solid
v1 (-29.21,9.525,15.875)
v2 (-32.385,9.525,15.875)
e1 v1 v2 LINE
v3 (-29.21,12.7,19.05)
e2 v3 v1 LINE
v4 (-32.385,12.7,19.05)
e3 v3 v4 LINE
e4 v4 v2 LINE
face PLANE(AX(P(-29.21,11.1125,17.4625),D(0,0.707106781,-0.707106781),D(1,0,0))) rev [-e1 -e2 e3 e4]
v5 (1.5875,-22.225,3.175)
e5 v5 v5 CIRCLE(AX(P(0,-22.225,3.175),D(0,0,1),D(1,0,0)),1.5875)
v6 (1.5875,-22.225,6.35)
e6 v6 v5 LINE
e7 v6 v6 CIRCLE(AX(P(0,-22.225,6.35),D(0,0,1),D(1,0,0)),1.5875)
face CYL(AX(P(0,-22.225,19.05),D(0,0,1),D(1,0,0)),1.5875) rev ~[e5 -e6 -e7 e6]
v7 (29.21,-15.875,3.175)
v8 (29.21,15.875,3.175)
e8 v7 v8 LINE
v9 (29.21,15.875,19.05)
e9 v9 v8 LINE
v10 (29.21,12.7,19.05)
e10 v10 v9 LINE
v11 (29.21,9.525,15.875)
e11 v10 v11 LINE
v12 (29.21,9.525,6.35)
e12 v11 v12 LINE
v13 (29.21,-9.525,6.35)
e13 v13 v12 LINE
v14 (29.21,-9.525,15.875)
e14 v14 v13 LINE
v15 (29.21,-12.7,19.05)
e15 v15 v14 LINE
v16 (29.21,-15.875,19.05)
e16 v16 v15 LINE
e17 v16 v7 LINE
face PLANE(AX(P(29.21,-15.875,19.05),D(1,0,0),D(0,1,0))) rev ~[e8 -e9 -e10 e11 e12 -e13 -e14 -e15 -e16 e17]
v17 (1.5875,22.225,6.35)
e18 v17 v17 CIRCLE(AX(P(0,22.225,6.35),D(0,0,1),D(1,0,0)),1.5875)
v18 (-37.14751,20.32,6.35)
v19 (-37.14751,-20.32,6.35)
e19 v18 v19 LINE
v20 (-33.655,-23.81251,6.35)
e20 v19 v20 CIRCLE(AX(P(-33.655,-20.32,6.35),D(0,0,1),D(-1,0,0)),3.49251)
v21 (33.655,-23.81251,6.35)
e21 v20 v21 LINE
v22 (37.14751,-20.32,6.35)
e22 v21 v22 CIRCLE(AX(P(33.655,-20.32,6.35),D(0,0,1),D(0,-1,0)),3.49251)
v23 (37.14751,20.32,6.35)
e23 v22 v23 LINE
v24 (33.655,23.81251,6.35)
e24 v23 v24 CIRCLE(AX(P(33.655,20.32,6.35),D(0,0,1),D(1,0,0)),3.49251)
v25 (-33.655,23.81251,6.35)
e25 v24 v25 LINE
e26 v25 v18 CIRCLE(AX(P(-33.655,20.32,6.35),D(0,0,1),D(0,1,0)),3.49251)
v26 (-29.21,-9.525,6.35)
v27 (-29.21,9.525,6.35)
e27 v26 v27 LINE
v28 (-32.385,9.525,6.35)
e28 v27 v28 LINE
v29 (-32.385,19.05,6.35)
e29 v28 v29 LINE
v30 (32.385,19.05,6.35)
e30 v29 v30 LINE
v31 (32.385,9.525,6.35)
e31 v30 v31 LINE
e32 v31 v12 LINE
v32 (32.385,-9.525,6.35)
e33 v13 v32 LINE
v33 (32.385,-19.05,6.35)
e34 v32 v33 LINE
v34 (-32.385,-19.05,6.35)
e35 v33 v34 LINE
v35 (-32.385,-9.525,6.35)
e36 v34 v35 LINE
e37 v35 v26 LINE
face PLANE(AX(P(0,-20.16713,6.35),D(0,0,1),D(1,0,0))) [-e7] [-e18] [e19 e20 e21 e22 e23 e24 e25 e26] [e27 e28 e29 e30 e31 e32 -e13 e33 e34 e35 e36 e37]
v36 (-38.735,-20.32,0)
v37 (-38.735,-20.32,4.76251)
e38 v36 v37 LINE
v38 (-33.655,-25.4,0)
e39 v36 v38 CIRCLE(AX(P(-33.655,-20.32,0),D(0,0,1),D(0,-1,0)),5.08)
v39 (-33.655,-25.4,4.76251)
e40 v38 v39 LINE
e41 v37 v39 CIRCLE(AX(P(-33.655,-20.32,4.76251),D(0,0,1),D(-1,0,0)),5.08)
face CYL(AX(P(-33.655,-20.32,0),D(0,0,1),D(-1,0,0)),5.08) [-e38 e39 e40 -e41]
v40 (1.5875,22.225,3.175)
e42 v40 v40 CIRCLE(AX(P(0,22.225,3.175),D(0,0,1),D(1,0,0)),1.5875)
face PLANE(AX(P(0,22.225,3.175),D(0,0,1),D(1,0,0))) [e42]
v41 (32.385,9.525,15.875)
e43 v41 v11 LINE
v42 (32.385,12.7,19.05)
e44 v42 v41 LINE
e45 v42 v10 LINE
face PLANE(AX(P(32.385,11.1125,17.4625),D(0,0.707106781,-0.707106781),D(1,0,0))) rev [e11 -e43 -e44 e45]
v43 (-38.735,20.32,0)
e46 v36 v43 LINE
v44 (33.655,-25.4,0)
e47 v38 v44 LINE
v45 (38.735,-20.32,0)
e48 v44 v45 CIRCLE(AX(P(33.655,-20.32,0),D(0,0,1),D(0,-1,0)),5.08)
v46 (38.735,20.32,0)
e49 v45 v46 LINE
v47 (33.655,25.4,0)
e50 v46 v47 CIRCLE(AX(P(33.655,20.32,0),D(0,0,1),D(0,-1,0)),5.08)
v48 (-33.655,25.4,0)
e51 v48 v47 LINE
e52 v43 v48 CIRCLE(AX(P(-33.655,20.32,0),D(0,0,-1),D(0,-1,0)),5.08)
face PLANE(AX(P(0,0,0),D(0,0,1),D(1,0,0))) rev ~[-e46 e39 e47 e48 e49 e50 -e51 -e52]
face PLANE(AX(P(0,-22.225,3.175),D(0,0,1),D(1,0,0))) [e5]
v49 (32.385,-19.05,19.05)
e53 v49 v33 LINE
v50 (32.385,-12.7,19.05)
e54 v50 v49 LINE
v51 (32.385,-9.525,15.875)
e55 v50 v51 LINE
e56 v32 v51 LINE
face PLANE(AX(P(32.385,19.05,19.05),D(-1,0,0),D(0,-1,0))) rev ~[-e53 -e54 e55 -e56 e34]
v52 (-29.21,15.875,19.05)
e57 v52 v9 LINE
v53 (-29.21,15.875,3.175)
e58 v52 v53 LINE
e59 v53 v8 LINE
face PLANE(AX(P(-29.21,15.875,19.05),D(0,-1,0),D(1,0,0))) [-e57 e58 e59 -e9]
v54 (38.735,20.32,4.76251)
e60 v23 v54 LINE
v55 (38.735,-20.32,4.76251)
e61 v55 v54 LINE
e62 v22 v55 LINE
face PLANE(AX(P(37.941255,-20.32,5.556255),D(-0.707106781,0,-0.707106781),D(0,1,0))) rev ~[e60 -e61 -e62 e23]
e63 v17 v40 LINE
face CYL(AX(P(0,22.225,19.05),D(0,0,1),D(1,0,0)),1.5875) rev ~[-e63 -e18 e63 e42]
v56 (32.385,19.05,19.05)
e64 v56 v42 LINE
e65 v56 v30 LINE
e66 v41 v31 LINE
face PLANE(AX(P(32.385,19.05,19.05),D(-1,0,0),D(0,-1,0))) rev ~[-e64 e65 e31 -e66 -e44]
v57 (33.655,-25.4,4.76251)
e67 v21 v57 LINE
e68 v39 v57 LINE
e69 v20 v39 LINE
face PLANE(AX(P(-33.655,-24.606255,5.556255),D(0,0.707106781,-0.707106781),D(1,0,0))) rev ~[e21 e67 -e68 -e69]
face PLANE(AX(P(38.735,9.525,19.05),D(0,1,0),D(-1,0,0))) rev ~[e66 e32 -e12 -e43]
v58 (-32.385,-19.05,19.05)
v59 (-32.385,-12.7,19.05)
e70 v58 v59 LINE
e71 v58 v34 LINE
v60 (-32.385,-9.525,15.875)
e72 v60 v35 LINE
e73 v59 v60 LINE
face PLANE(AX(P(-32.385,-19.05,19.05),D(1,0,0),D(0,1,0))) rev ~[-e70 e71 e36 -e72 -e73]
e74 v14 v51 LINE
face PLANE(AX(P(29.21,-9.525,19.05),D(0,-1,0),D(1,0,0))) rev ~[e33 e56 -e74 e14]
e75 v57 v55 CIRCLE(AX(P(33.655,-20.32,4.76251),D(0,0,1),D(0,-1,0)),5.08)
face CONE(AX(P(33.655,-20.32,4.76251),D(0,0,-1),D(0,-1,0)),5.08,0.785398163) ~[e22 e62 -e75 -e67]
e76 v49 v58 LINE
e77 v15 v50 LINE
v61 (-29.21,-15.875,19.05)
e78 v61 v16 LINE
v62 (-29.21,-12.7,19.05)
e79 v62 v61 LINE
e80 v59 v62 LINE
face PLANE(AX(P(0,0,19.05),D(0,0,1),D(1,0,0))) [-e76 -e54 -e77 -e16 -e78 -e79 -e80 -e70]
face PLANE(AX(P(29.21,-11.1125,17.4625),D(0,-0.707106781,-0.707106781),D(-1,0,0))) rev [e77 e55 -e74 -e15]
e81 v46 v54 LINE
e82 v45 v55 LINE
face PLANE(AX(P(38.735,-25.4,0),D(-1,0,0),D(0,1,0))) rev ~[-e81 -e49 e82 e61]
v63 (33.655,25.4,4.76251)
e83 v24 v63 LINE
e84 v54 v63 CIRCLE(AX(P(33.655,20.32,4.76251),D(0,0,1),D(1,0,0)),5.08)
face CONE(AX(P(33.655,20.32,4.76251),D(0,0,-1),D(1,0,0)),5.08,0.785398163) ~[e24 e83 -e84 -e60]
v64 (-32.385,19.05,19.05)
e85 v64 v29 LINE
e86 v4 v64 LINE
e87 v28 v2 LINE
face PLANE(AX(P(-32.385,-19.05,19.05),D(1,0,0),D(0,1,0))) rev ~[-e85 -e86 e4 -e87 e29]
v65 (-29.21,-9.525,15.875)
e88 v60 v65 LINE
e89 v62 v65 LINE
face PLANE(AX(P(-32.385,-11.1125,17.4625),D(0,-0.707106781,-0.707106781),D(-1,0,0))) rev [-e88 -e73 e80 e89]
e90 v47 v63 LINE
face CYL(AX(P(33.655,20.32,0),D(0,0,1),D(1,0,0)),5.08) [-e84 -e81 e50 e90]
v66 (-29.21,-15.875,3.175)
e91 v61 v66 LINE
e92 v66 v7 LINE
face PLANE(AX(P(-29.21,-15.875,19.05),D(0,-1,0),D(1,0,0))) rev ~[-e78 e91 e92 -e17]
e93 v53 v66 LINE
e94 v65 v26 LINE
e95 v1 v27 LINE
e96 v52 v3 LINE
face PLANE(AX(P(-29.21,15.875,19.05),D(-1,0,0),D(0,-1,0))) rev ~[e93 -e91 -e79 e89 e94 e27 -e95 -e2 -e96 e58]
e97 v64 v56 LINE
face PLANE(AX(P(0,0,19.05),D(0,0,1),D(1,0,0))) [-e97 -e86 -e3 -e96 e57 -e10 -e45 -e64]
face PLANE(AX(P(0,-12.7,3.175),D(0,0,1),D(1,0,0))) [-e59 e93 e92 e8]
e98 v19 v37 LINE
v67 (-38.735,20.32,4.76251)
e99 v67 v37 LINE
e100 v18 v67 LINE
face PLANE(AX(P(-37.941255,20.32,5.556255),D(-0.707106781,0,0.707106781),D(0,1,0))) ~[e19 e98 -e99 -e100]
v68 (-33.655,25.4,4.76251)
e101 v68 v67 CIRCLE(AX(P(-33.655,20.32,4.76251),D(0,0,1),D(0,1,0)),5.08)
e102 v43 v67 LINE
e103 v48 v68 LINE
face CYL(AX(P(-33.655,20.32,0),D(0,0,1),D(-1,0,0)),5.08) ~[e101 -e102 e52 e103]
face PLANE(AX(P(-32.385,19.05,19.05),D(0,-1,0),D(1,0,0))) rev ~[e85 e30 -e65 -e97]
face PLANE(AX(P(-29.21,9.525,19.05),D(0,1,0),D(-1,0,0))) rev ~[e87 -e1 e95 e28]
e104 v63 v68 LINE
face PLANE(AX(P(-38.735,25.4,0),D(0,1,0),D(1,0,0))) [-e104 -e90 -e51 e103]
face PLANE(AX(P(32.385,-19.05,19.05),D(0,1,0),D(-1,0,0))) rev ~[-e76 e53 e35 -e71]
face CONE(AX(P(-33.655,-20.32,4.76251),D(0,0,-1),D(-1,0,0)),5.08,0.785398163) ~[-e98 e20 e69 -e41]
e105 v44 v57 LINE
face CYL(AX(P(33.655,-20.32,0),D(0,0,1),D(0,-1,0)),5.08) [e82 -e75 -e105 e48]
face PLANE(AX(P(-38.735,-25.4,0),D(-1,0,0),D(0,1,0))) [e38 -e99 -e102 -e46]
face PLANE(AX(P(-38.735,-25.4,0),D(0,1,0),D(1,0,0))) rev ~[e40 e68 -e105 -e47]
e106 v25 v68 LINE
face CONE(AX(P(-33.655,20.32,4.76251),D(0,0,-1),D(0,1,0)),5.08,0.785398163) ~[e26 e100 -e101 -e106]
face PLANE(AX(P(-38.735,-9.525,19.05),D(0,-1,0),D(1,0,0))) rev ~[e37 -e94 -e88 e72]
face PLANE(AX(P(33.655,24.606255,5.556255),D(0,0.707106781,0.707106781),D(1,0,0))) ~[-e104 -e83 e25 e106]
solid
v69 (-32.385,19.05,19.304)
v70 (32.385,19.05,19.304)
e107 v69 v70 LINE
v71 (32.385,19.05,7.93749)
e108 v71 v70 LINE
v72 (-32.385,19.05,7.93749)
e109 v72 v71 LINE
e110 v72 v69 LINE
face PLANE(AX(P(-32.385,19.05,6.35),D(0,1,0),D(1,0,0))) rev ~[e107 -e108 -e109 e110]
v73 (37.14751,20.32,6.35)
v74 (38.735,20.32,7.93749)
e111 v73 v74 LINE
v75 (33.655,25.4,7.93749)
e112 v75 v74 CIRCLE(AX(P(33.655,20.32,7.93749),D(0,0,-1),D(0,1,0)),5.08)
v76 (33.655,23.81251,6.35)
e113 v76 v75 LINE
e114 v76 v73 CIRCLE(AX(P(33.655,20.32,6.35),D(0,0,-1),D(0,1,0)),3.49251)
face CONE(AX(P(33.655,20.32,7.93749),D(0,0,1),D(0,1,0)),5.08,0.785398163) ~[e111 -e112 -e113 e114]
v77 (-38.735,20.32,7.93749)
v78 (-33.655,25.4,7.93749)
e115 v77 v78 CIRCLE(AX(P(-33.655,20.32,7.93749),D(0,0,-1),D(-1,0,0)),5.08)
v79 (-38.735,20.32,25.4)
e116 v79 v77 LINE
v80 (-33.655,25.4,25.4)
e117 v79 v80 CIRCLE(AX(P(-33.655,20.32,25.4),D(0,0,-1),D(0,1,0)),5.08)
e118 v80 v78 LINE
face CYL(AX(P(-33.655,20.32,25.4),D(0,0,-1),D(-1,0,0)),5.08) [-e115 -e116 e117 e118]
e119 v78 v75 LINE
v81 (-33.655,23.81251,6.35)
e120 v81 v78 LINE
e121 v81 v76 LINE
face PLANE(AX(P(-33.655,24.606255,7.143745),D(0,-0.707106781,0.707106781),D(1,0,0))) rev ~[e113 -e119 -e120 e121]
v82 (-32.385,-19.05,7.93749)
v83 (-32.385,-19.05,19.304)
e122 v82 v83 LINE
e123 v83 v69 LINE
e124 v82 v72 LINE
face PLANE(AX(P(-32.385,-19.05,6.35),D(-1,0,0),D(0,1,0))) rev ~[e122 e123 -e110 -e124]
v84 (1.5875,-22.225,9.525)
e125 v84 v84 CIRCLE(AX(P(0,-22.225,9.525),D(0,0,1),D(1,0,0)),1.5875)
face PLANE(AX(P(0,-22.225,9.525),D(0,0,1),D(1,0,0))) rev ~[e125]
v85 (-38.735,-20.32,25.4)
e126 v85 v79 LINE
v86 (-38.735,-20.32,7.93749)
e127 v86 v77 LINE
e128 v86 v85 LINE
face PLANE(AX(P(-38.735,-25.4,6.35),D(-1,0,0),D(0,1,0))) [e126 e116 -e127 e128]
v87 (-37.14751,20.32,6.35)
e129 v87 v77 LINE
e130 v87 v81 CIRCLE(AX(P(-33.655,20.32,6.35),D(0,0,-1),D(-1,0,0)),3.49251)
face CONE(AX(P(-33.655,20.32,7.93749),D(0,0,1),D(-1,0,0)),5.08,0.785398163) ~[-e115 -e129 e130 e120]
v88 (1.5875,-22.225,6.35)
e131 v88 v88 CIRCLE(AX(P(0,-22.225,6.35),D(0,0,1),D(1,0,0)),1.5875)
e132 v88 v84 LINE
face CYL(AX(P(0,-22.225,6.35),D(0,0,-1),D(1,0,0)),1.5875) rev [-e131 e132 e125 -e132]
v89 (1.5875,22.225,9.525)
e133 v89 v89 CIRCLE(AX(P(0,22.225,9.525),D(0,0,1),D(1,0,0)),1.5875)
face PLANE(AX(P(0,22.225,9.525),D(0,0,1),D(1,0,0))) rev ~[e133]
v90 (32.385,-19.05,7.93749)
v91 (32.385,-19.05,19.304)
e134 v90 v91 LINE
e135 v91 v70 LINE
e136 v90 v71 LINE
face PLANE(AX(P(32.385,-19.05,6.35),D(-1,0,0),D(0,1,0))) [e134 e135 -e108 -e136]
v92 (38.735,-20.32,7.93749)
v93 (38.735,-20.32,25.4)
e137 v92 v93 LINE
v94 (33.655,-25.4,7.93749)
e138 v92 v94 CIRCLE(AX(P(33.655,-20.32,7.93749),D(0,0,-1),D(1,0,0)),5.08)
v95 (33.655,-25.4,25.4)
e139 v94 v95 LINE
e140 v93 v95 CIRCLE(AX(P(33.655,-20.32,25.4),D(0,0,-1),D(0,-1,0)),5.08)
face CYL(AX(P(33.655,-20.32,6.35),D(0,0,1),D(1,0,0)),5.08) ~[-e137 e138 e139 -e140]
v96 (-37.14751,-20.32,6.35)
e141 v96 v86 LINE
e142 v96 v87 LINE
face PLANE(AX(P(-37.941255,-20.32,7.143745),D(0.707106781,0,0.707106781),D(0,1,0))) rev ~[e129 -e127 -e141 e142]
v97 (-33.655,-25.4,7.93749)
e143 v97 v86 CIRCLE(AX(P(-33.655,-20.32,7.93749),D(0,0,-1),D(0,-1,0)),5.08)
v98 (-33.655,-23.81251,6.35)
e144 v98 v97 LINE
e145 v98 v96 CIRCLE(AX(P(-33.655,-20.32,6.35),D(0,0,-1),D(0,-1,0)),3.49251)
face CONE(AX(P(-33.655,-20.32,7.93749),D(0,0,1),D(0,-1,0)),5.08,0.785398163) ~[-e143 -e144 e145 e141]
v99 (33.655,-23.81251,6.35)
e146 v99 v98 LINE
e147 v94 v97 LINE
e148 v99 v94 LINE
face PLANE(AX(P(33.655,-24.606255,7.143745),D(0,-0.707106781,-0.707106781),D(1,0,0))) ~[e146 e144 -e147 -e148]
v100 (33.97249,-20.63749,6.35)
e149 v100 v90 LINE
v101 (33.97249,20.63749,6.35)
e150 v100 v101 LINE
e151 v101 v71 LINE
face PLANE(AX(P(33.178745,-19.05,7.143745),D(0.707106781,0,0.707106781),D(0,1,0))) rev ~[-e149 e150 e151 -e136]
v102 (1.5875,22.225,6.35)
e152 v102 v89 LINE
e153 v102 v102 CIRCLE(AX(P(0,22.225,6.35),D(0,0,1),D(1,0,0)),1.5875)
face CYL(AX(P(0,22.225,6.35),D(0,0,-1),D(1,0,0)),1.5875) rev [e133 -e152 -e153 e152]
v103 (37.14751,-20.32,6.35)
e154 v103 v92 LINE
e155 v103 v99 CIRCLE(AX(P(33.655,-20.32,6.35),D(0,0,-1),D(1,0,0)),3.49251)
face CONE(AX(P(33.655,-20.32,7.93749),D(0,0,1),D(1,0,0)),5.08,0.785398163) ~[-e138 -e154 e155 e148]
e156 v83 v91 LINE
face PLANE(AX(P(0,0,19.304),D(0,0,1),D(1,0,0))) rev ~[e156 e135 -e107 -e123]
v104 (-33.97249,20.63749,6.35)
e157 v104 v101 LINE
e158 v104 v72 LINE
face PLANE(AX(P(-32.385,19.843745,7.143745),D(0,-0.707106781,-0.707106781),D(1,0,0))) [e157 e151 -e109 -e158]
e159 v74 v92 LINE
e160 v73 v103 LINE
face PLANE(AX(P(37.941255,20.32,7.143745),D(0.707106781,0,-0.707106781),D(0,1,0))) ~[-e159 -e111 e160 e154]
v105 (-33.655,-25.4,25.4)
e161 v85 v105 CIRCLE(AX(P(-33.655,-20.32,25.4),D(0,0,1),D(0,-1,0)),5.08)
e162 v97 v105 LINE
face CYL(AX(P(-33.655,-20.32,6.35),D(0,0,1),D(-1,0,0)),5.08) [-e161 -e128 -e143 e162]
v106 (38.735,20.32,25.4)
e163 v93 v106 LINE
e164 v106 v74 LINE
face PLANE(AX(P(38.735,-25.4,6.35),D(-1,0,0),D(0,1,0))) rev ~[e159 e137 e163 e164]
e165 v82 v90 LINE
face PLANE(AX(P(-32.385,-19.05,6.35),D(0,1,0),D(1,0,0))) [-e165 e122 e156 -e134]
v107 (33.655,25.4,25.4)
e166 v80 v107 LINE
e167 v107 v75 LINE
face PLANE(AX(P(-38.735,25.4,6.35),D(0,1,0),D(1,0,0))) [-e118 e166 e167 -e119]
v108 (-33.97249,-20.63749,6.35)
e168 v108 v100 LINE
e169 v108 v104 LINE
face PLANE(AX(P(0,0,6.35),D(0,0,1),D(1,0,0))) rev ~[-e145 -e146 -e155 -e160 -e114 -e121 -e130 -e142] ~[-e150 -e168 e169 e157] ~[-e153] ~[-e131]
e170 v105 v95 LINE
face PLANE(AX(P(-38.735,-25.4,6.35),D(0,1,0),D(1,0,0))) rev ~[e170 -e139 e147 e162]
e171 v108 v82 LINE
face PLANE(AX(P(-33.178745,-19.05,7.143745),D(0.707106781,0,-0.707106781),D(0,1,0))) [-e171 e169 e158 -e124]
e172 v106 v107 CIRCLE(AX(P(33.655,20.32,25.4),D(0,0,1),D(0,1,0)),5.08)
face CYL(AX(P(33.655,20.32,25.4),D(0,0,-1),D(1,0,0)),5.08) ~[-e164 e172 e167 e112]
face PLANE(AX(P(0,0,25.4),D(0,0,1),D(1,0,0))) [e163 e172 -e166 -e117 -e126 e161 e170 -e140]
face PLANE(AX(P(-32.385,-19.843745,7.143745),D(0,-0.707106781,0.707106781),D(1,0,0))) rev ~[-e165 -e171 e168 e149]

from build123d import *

# Parameters (mm, degrees)
F0_W       = 77.47
F0_H       = 50.8
F1_DEPTH   = 19.05
F2_W       = 58.42
F2_H       = 6.35
F2_H_2     = 19.05
F3_DEPTH   = 15.875
F2_R       = 1.5875
F2_W_2     = 6.35
F4_DEPTH   = 12.7
F2_W_3     = 3.175
F5_DEPTH   = 12.7
F6_SIZE    = 3.175
F7_W       = 77.47
F7_H       = 50.8
F7_W_2     = 64.77
F7_H_2     = 38.1
F8_DEPTH   = 19.05
F9_W       = 77.47
F9_H       = 50.8
F9_W_2     = 64.77
F9_H_2     = 38.1
F10_DEPTH  = 6.096
F11_R      = 5.08
F11_2_R    = 5.08
F12_DEPTH  = 15.875
F13_SIZE   = 1.58749
F13_2_SIZE = 1.58749
F14_R      = 1.5875
F15_DEPTH  = 3.175


# Not quite as in the source:
# - a fillet or chamfer is up to 0.001 mm smaller than in the source, because OpenCascade refuses the exact size


with BuildPart() as f1:
    # F0 (on Top) → F1 (new body)
    with BuildSketch(Plane.XY):
        Rectangle(F0_W, F0_H)
    extrude(amount=F1_DEPTH)

    # F2 (on face) → F3 (cut)
    with BuildSketch(Plane.XY.offset(19.05)):
        with Locations((0, -12.7)):
            Rectangle(F2_W, F2_H)
        Rectangle(F2_W, F2_H_2)
        with Locations((0, 12.7)):
            Rectangle(F2_W, F2_H)
    extrude(amount=-F3_DEPTH, mode=Mode.SUBTRACT)

    # F2 (on face) → F4 (cut)
    with BuildSketch(Plane.XY.offset(19.05)):
        Polygon((38.735, -9.525), (32.385, -9.525), (32.385, -19.05), (-32.385, -19.05), (-32.385, -9.525), (-38.735, -9.525), (-38.735, -25.4), (38.735, -25.4), align=None)
        with Locations((0, -22.225)):
            Circle(F2_R, mode=Mode.SUBTRACT)
        Polygon((32.385, 19.05), (32.385, 9.525), (38.735, 9.525), (38.735, 25.4), (-38.735, 25.4), (-38.735, 9.525), (-32.385, 9.525), (-32.385, 19.05), align=None)
        with Locations((0, 22.225)):
            Circle(F2_R, mode=Mode.SUBTRACT)
        with Locations((-35.56, 0)):
            Rectangle(F2_W_2, F2_H_2)
        with Locations((35.56, 0)):
            Rectangle(F2_W_2, F2_H_2)
        with Locations((0, 22.225)):
            Circle(F2_R)
        with Locations((0, -22.225)):
            Circle(F2_R)
    extrude(amount=-F4_DEPTH, mode=Mode.SUBTRACT)

    # F2 (on face) → F5 (cut)
    with BuildSketch(Plane.XY.offset(19.05)):
        with Locations((-35.56, 0)):
            Rectangle(F2_W_2, F2_H_2)
        with Locations((-30.7975, 0)):
            Rectangle(F2_W_3, F2_H_2)
        with Locations((30.7975, 0)):
            Rectangle(F2_W_3, F2_H_2)
        with Locations((35.56, 0)):
            Rectangle(F2_W_2, F2_H_2)
    extrude(amount=-F5_DEPTH, mode=Mode.SUBTRACT)

    # F6
    f6_edges = [f1.edges().sort_by_distance(p)[0] for p in [
        (-30.7975, 9.525, 19.05),
        (-30.7975, -9.525, 19.05),
        (30.7975, 9.525, 19.05),
        (30.7975, -9.525, 19.05),
    ]]
    chamfer(f6_edges, length=F6_SIZE)

    # F11
    f11_edges = [f1.edges().sort_by_distance(p)[0] for p in [
        (-38.735, 25.4, 3.175),
        (-38.735, -25.4, 3.175),
        (38.735, 25.4, 3.175),
        (38.735, -25.4, 3.175),
    ]]
    fillet(f11_edges, radius=F11_R)

    # F2 (on face) → F12 (cut)
    with BuildSketch(Plane.XY.offset(19.05)):
        with Locations((0, 22.225)):
            Circle(F2_R)
        with Locations((0, -22.225)):
            Circle(F2_R)
    extrude(amount=-F12_DEPTH, mode=Mode.SUBTRACT)

    # F13 (size 1.5875 in the source; OpenCascade refuses exactly that, so slightly less here)
    f13_edges = [f1.edges().sort_by_distance(p)[0] for p in [
        (0, 25.4, 6.35),
        (-38.735, 0, 6.35),
        (38.735, 0, 6.35),
        (37.247102, 23.912102, 6.35),
        (37.247102, -23.912102, 6.35),
        (0, -25.4, 6.35),
        (-37.247102, 23.912102, 6.35),
        (-37.247102, -23.912102, 6.35),
    ]]
    chamfer(f13_edges, length=F13_SIZE)


with BuildPart() as f8:
    # F7 (on face) → F8 (new body)
    with BuildSketch(Plane.XY.offset(6.35)):
        Rectangle(F7_W, F7_H)
        Rectangle(F7_W_2, F7_H_2, mode=Mode.SUBTRACT)
    extrude(amount=F8_DEPTH)

    # F9 (on face) → F10 (join)
    with BuildSketch(Plane.XY.offset(25.4)):
        Rectangle(F9_W, F9_H)
        Rectangle(F9_W_2, F9_H_2, mode=Mode.SUBTRACT)
        Rectangle(F9_W_2, F9_H_2)
    extrude(amount=-F10_DEPTH)

    # F11#2
    f11_2_edges = [f8.edges().sort_by_distance(p)[0] for p in [
        (-38.735, 25.4, 15.875),
        (-38.735, -25.4, 15.875),
        (38.735, 25.4, 15.875),
        (38.735, -25.4, 15.875),
    ]]
    fillet(f11_2_edges, radius=F11_2_R)

    # F13#2 (size 1.5875 in the source; OpenCascade refuses exactly that, so slightly less here)
    f13_2_edges = [f8.edges().sort_by_distance(p)[0] for p in [
        (0, 25.4, 6.35),
        (-38.735, 0, 6.35),
        (0, 19.05, 6.35),
        (-32.385, 0, 6.35),
        (0, -19.05, 6.35),
        (32.385, 0, 6.35),
        (38.735, 0, 6.35),
        (37.247102, 23.912102, 6.35),
        (37.247102, -23.912102, 6.35),
        (0, -25.4, 6.35),
        (-37.247102, 23.912102, 6.35),
        (-37.247102, -23.912102, 6.35),
    ]]
    chamfer(f13_2_edges, length=F13_2_SIZE)

    # F14 (on face) → F15 (cut)
    with BuildSketch(Plane.XY.offset(6.35)):
        with Locations((0, 22.225)):
            Circle(F14_R)
        with Locations((0, -22.225)):
            Circle(F14_R)
    extrude(amount=F15_DEPTH, mode=Mode.SUBTRACT)


solid = Compound([f1.part, f8.part])
